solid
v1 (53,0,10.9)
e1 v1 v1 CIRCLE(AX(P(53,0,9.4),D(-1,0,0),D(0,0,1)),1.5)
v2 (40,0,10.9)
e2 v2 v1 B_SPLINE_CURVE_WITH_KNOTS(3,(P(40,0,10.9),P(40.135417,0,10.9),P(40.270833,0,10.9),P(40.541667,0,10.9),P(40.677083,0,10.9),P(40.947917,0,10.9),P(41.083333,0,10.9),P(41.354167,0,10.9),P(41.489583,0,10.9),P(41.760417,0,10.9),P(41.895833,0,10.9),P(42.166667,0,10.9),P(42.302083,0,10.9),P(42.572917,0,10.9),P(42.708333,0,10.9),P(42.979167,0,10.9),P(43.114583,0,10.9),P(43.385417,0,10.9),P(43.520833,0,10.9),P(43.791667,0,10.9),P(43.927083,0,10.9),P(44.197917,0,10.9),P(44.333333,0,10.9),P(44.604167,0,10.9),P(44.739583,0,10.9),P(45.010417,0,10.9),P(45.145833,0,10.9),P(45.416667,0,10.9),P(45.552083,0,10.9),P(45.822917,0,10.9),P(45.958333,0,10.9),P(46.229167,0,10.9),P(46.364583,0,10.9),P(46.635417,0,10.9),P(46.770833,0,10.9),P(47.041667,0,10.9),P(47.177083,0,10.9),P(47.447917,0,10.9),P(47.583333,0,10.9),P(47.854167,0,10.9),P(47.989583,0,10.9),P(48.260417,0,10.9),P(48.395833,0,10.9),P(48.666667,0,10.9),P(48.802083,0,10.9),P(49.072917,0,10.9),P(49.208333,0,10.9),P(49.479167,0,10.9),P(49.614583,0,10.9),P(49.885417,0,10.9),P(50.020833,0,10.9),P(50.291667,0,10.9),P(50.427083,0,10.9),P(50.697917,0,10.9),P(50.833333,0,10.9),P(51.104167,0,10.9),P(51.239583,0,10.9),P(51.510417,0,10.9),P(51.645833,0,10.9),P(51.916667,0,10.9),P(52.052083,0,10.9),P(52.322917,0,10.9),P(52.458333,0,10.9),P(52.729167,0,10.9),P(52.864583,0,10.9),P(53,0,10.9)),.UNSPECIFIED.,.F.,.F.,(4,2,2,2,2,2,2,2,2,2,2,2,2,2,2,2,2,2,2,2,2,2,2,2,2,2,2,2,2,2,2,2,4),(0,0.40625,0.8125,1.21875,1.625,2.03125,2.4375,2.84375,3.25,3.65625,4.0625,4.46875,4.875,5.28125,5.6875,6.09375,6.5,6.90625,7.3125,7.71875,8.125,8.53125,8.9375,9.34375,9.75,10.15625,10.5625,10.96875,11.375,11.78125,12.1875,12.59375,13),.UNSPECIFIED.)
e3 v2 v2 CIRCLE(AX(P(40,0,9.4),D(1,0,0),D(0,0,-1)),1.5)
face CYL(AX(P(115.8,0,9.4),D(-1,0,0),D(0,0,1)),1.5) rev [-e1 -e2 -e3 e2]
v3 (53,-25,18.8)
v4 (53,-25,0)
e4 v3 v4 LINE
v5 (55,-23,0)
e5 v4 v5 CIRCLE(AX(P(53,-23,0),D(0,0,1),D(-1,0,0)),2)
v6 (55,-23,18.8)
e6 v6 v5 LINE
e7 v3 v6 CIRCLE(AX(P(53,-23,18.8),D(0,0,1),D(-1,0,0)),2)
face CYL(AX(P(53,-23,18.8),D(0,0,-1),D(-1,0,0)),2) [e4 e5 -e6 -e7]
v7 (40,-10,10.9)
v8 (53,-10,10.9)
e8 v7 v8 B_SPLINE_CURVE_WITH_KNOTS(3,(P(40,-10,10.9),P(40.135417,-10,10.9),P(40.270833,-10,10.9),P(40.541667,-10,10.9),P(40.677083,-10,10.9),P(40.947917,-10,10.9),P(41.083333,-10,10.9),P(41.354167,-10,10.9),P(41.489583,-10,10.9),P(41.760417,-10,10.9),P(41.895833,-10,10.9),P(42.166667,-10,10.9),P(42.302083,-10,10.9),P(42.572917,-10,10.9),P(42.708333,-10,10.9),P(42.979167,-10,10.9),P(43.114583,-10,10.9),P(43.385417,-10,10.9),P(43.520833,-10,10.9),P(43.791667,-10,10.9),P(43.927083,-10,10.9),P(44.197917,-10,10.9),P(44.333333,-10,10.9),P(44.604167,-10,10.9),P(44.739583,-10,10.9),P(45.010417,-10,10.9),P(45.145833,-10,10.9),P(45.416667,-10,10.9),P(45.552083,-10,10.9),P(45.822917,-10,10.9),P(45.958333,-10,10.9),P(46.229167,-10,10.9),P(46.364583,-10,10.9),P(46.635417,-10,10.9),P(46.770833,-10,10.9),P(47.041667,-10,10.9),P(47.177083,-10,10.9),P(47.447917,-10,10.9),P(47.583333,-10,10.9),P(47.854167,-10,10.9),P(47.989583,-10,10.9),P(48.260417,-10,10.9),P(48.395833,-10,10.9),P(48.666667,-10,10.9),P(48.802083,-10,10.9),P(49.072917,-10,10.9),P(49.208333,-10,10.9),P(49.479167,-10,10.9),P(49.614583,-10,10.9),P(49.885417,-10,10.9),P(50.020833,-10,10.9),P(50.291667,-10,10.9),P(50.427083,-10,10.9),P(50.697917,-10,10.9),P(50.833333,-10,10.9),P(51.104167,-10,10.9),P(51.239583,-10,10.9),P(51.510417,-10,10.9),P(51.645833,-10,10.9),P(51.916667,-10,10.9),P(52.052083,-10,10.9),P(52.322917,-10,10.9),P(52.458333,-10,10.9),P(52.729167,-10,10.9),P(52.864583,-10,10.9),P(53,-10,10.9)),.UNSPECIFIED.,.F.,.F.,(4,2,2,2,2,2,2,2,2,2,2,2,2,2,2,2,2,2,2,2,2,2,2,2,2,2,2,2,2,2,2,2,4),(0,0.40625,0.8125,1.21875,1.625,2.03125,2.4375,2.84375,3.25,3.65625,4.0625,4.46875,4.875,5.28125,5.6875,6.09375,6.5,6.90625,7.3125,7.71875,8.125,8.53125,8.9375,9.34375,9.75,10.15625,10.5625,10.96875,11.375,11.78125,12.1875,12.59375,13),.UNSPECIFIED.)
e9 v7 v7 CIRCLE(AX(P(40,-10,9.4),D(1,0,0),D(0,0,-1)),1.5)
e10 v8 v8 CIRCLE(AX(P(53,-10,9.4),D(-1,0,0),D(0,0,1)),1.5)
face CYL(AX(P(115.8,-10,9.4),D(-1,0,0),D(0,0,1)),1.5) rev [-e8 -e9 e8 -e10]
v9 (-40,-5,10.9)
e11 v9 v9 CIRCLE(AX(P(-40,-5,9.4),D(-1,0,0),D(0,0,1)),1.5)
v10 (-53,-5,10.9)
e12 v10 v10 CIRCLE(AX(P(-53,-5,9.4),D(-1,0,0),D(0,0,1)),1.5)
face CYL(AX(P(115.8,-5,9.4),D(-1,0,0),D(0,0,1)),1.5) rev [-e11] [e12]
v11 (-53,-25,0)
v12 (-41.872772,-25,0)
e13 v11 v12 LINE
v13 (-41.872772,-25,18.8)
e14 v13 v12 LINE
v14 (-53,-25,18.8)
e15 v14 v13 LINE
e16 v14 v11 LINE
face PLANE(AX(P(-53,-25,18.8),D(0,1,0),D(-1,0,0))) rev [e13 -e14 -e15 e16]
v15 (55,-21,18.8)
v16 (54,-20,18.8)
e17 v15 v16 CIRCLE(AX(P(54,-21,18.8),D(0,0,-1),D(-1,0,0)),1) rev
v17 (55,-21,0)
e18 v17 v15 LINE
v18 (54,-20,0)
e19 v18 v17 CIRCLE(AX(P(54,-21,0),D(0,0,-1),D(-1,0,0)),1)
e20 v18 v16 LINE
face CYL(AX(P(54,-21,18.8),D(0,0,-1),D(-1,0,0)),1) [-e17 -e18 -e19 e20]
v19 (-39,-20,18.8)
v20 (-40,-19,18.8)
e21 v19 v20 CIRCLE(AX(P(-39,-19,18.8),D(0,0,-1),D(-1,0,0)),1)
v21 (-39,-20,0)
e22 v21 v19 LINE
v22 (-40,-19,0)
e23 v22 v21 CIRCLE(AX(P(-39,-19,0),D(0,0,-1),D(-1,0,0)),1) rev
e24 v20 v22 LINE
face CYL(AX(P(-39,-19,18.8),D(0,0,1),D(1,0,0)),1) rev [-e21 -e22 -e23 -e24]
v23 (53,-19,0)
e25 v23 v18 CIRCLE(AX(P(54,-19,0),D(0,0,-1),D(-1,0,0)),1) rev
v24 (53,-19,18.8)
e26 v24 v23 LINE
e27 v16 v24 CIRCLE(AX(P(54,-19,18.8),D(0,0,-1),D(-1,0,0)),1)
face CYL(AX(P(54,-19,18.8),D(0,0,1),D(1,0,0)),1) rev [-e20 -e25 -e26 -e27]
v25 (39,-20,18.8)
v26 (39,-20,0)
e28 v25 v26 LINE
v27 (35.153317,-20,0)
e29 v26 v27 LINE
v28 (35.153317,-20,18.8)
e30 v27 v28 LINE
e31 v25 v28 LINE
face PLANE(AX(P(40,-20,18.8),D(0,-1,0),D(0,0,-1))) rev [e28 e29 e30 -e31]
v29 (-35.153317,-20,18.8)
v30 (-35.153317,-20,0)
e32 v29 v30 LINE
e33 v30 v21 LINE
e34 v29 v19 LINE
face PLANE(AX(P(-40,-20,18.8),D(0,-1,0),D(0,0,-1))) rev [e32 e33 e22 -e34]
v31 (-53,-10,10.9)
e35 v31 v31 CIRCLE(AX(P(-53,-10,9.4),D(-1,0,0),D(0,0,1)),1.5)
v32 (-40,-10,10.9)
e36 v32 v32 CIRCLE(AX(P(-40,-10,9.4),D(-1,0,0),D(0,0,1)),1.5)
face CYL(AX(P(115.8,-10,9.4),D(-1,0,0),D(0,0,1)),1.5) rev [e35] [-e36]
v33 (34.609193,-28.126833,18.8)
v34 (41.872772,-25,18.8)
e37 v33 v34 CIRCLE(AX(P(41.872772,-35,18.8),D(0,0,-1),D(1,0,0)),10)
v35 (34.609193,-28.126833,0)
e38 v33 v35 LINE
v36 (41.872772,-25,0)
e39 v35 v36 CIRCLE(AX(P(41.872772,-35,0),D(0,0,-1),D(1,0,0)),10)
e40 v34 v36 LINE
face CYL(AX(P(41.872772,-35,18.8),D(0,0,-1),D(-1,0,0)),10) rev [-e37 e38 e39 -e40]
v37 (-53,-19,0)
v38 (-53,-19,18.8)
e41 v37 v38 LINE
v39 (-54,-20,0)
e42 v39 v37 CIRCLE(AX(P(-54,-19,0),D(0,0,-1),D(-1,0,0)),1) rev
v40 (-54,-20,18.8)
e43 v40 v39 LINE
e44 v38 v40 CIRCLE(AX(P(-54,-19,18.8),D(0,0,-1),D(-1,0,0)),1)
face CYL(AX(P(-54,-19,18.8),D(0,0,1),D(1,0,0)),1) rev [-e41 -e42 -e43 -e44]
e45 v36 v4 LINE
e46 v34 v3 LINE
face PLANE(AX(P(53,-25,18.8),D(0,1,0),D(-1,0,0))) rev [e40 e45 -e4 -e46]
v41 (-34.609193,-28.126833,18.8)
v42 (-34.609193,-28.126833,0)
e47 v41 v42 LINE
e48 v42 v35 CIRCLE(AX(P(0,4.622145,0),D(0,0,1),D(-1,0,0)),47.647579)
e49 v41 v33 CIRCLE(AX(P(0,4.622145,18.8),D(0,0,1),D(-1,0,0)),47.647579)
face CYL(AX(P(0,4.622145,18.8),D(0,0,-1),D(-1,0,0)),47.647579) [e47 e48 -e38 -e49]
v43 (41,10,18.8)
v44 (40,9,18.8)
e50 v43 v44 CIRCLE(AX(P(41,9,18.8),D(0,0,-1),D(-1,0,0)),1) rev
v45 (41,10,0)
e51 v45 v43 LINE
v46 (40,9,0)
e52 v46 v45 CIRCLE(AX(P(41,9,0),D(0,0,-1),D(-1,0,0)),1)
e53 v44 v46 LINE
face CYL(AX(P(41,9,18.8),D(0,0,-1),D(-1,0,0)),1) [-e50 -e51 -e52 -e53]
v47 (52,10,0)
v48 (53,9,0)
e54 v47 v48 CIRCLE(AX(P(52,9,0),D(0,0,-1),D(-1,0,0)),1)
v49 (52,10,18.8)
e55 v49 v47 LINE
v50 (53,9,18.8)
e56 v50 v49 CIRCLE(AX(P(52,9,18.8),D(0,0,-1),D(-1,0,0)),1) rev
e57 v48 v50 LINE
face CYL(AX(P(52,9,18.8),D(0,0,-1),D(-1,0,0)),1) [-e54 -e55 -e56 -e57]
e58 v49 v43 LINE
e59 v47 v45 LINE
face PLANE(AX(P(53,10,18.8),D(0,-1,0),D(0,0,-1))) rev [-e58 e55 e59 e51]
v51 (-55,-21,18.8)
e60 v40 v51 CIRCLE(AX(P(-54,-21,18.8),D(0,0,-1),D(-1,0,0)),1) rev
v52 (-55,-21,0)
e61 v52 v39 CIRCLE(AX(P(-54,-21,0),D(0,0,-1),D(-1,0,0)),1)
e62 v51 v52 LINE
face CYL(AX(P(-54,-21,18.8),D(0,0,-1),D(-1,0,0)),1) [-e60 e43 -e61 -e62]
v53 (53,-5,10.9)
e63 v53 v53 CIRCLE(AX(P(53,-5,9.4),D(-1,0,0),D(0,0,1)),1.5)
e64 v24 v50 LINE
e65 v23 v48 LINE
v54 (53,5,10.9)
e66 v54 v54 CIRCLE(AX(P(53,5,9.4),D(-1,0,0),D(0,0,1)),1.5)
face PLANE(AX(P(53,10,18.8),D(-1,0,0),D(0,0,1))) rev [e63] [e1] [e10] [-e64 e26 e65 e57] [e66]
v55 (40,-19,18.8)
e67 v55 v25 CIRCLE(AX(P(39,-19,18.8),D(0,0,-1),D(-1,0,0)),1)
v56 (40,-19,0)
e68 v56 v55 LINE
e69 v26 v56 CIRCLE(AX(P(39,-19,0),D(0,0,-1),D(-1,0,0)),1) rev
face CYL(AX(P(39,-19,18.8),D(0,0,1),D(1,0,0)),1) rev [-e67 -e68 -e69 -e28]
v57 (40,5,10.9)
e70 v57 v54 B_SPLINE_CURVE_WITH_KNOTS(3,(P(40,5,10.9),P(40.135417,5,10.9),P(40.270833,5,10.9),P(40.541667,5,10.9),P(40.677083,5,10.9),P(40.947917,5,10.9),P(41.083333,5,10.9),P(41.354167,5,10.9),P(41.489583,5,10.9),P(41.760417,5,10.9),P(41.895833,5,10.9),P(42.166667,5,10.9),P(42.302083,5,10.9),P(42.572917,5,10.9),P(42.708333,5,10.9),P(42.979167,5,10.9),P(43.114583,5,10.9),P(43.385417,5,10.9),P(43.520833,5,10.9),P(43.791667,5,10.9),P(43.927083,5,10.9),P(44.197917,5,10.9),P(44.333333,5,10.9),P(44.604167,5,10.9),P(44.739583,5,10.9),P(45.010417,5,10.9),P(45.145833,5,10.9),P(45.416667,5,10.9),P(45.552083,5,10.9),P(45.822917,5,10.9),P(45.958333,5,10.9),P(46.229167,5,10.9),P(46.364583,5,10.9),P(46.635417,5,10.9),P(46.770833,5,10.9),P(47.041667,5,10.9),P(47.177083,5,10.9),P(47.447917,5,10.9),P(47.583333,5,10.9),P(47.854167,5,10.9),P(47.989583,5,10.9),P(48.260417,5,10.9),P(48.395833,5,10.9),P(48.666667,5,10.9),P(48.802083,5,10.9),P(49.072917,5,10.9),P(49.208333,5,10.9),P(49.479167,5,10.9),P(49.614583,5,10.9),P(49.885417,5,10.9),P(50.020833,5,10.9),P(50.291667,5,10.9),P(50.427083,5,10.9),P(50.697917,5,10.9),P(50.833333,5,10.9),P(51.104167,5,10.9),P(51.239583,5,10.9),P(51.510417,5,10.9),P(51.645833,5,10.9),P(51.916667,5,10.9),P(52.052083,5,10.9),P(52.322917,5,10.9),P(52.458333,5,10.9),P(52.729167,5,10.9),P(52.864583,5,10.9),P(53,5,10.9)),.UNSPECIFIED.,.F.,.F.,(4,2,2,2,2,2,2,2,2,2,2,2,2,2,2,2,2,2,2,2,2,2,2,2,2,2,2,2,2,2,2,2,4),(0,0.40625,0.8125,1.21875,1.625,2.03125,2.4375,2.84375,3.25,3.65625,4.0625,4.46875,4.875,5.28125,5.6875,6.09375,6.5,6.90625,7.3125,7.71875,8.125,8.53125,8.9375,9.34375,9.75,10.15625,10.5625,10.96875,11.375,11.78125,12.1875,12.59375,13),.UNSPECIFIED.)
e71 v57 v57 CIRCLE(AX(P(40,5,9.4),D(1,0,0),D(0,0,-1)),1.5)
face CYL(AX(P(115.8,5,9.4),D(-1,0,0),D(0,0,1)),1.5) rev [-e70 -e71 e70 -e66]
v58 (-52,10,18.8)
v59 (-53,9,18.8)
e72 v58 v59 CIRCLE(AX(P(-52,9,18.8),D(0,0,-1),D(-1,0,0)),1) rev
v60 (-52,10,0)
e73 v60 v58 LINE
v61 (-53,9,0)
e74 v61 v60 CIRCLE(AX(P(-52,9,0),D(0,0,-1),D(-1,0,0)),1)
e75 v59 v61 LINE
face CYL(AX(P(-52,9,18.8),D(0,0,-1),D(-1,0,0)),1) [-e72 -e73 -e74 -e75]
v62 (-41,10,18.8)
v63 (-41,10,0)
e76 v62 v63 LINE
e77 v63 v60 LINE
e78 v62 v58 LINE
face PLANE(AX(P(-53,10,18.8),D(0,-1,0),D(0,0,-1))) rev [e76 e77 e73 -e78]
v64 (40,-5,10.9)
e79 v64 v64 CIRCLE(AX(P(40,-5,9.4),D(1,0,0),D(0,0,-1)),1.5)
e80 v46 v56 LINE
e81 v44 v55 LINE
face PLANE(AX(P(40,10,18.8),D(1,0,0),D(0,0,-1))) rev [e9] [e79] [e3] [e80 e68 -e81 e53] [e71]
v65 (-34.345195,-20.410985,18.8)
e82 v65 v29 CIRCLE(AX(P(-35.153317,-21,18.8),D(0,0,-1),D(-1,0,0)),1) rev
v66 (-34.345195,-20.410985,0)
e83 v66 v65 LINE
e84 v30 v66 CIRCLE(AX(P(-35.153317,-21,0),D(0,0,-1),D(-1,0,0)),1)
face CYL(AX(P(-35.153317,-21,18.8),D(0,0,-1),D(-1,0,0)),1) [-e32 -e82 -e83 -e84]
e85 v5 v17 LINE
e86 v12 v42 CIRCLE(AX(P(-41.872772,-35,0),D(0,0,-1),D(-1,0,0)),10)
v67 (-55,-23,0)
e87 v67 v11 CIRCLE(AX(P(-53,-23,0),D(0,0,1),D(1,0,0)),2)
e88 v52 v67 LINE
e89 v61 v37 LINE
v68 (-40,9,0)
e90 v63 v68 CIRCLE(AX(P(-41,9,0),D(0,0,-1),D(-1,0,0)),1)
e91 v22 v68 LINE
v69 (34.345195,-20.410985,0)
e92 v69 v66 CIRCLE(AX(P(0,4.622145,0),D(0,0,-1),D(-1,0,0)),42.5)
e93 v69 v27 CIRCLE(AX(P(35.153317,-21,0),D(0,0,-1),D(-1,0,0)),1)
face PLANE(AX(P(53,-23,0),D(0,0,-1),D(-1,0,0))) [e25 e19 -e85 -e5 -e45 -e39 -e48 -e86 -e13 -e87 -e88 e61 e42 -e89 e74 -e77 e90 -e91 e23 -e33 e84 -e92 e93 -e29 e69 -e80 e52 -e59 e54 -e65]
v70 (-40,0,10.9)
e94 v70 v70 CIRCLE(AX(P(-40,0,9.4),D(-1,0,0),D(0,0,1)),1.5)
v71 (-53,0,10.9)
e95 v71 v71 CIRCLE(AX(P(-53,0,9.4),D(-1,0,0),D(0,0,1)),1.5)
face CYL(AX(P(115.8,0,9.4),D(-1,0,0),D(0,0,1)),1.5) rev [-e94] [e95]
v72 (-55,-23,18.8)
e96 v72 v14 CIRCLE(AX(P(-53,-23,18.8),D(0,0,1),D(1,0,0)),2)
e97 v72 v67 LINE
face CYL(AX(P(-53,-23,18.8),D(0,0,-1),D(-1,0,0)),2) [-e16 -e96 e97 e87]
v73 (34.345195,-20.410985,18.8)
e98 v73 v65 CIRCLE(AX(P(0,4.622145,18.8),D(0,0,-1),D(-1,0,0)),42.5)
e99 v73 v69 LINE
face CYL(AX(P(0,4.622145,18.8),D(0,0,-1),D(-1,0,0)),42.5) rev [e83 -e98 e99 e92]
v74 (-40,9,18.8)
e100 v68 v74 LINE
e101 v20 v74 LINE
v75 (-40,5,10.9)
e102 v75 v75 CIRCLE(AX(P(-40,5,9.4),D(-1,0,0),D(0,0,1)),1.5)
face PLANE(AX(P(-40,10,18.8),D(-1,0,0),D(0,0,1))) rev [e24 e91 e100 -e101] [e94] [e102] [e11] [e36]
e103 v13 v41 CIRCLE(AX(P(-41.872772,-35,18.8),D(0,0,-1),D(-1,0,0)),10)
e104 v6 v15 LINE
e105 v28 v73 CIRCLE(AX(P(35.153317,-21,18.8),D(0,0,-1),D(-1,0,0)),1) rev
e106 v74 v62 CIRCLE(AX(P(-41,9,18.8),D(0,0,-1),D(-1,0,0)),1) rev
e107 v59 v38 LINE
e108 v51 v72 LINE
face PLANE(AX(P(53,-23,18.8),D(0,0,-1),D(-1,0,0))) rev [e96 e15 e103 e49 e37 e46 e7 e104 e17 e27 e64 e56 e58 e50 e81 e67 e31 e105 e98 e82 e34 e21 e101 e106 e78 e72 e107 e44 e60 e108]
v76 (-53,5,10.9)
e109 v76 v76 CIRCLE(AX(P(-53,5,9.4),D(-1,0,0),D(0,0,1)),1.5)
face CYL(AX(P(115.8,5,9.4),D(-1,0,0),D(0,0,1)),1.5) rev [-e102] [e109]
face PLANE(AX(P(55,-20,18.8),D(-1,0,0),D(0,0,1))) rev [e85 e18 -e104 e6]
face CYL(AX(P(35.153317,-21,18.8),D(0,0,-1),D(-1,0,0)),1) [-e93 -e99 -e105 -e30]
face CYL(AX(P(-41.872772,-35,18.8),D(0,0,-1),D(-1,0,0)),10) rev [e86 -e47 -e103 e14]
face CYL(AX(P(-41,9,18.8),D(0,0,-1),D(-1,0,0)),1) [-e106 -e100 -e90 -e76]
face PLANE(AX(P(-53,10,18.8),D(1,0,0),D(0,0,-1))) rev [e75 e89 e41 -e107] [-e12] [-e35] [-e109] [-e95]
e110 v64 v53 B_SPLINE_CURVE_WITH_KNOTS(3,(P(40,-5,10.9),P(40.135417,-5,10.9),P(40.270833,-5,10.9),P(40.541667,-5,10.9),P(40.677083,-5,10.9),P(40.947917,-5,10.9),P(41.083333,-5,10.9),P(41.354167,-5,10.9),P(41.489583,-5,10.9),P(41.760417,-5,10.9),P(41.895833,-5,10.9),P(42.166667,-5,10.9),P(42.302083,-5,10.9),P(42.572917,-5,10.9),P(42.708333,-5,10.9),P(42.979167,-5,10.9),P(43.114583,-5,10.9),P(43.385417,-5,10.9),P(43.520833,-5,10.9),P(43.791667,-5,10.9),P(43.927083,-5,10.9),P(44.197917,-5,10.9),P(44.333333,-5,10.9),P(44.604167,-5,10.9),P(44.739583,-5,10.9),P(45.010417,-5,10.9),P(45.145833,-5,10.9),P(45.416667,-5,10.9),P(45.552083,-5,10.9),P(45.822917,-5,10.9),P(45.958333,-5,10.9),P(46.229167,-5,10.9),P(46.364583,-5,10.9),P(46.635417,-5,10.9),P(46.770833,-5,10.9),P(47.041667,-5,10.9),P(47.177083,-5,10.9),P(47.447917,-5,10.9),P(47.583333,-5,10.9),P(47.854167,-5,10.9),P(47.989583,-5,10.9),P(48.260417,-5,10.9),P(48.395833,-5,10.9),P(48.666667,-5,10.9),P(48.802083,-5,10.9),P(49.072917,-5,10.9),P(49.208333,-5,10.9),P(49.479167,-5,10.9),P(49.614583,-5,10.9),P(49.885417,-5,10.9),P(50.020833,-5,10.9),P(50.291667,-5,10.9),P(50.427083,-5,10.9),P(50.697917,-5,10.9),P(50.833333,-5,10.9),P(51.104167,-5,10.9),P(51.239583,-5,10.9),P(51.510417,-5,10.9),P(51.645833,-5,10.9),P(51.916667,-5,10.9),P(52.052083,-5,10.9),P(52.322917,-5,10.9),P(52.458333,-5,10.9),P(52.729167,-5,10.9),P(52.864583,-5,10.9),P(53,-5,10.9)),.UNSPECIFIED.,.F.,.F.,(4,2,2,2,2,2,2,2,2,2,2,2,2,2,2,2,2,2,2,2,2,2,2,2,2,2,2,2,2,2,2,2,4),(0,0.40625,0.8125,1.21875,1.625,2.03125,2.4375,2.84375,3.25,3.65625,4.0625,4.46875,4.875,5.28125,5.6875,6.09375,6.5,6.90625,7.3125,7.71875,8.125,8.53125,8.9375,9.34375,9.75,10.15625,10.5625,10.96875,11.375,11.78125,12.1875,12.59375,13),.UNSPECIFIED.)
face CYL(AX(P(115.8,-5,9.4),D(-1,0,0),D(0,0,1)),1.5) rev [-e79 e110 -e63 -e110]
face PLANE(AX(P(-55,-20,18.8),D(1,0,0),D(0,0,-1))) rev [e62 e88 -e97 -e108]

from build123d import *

# Parameters (mm, degrees)
BOSS_EXTRUDE1_DEPTH = 18.8
SKETCH2_R           = 1.5
CUT_EXTRUDE1_DEPTH  = 168.8
FILLET1_R           = 1
FILLET2_R           = 1


with BuildPart() as part:
    # Sketch1 → Boss-Extrude1 (new body)
    with BuildSketch(Plane.XY):
        with BuildLine():
            Line((53, 10), (40, 10))
            Line((40, 10), (40, -20))
            Line((40, -20), (34.641016151, -20))
            ThreePointArc((34.641016151, -20), (0, -37.877855496), (-34.641016151, -20))
            Line((-34.641016151, -20), (-40, -20))
            Line((-40, -20), (-40, 10))
            Line((-40, 10), (-53, 10))
            Line((-53, 10), (-53, -20))
            Line((-53, -20), (-55, -20))
            Line((-55, -20), (-55, -23))
            ThreePointArc((-55, -23), (-54.414213562, -24.414213562), (-53, -25))
            Line((-53, -25), (-41.872771696, -25))
            ThreePointArc((-41.872771696, -25), (-37.918765594, -25.814912317), (-34.609193147, -28.12683285))
            ThreePointArc((-34.609193147, -28.12683285), (0, -43.025434322), (34.609193147, -28.12683285))
            ThreePointArc((34.609193147, -28.12683285), (37.918765594, -25.814912317), (41.872771696, -25))
            Line((41.872771696, -25), (53, -25))
            ThreePointArc((53, -25), (54.414213562, -24.414213562), (55, -23))
            Line((55, -23), (55, -20))
            Line((55, -20), (53, -20))
            Line((53, -20), (53, 10))
        make_face()
    extrude(amount=BOSS_EXTRUDE1_DEPTH)

    # Sketch2 → Cut-Extrude1 (cut)
    with BuildSketch(Plane.ZY.offset(53)):
        with Locations((9.4, -5)):
            Circle(SKETCH2_R)
        with Locations((9.4, 5)):
            Circle(SKETCH2_R)
        with Locations((9.4, 0)):
            Circle(SKETCH2_R)
        with Locations((9.4, -10)):
            Circle(SKETCH2_R)
    extrude(amount=-CUT_EXTRUDE1_DEPTH, mode=Mode.SUBTRACT)

    # Fillet1
    fillet1_edges = [part.edges().sort_by_distance(p)[0] for p in [
        (-40, -20, 9.4),
        (-34.641016151, -20, 9.4),
        (34.641016151, -20, 9.4),
        (40, -20, 9.4),
    ]]
    fillet(fillet1_edges, radius=FILLET1_R)

    # Fillet2
    fillet2_edges = [part.edges().sort_by_distance(p)[0] for p in [
        (-55, -20, 9.4),
        (-53, -20, 9.4),
        (-40, 10, 9.4),
        (-53, 10, 9.4),
        (55, -20, 9.4),
        (53, -20, 9.4),
        (53, 10, 9.4),
        (40, 10, 9.4),
    ]]
    fillet(fillet2_edges, radius=FILLET2_R - 0.0001)  # a hair under: the kernel refuses the full size


solid = part.part
